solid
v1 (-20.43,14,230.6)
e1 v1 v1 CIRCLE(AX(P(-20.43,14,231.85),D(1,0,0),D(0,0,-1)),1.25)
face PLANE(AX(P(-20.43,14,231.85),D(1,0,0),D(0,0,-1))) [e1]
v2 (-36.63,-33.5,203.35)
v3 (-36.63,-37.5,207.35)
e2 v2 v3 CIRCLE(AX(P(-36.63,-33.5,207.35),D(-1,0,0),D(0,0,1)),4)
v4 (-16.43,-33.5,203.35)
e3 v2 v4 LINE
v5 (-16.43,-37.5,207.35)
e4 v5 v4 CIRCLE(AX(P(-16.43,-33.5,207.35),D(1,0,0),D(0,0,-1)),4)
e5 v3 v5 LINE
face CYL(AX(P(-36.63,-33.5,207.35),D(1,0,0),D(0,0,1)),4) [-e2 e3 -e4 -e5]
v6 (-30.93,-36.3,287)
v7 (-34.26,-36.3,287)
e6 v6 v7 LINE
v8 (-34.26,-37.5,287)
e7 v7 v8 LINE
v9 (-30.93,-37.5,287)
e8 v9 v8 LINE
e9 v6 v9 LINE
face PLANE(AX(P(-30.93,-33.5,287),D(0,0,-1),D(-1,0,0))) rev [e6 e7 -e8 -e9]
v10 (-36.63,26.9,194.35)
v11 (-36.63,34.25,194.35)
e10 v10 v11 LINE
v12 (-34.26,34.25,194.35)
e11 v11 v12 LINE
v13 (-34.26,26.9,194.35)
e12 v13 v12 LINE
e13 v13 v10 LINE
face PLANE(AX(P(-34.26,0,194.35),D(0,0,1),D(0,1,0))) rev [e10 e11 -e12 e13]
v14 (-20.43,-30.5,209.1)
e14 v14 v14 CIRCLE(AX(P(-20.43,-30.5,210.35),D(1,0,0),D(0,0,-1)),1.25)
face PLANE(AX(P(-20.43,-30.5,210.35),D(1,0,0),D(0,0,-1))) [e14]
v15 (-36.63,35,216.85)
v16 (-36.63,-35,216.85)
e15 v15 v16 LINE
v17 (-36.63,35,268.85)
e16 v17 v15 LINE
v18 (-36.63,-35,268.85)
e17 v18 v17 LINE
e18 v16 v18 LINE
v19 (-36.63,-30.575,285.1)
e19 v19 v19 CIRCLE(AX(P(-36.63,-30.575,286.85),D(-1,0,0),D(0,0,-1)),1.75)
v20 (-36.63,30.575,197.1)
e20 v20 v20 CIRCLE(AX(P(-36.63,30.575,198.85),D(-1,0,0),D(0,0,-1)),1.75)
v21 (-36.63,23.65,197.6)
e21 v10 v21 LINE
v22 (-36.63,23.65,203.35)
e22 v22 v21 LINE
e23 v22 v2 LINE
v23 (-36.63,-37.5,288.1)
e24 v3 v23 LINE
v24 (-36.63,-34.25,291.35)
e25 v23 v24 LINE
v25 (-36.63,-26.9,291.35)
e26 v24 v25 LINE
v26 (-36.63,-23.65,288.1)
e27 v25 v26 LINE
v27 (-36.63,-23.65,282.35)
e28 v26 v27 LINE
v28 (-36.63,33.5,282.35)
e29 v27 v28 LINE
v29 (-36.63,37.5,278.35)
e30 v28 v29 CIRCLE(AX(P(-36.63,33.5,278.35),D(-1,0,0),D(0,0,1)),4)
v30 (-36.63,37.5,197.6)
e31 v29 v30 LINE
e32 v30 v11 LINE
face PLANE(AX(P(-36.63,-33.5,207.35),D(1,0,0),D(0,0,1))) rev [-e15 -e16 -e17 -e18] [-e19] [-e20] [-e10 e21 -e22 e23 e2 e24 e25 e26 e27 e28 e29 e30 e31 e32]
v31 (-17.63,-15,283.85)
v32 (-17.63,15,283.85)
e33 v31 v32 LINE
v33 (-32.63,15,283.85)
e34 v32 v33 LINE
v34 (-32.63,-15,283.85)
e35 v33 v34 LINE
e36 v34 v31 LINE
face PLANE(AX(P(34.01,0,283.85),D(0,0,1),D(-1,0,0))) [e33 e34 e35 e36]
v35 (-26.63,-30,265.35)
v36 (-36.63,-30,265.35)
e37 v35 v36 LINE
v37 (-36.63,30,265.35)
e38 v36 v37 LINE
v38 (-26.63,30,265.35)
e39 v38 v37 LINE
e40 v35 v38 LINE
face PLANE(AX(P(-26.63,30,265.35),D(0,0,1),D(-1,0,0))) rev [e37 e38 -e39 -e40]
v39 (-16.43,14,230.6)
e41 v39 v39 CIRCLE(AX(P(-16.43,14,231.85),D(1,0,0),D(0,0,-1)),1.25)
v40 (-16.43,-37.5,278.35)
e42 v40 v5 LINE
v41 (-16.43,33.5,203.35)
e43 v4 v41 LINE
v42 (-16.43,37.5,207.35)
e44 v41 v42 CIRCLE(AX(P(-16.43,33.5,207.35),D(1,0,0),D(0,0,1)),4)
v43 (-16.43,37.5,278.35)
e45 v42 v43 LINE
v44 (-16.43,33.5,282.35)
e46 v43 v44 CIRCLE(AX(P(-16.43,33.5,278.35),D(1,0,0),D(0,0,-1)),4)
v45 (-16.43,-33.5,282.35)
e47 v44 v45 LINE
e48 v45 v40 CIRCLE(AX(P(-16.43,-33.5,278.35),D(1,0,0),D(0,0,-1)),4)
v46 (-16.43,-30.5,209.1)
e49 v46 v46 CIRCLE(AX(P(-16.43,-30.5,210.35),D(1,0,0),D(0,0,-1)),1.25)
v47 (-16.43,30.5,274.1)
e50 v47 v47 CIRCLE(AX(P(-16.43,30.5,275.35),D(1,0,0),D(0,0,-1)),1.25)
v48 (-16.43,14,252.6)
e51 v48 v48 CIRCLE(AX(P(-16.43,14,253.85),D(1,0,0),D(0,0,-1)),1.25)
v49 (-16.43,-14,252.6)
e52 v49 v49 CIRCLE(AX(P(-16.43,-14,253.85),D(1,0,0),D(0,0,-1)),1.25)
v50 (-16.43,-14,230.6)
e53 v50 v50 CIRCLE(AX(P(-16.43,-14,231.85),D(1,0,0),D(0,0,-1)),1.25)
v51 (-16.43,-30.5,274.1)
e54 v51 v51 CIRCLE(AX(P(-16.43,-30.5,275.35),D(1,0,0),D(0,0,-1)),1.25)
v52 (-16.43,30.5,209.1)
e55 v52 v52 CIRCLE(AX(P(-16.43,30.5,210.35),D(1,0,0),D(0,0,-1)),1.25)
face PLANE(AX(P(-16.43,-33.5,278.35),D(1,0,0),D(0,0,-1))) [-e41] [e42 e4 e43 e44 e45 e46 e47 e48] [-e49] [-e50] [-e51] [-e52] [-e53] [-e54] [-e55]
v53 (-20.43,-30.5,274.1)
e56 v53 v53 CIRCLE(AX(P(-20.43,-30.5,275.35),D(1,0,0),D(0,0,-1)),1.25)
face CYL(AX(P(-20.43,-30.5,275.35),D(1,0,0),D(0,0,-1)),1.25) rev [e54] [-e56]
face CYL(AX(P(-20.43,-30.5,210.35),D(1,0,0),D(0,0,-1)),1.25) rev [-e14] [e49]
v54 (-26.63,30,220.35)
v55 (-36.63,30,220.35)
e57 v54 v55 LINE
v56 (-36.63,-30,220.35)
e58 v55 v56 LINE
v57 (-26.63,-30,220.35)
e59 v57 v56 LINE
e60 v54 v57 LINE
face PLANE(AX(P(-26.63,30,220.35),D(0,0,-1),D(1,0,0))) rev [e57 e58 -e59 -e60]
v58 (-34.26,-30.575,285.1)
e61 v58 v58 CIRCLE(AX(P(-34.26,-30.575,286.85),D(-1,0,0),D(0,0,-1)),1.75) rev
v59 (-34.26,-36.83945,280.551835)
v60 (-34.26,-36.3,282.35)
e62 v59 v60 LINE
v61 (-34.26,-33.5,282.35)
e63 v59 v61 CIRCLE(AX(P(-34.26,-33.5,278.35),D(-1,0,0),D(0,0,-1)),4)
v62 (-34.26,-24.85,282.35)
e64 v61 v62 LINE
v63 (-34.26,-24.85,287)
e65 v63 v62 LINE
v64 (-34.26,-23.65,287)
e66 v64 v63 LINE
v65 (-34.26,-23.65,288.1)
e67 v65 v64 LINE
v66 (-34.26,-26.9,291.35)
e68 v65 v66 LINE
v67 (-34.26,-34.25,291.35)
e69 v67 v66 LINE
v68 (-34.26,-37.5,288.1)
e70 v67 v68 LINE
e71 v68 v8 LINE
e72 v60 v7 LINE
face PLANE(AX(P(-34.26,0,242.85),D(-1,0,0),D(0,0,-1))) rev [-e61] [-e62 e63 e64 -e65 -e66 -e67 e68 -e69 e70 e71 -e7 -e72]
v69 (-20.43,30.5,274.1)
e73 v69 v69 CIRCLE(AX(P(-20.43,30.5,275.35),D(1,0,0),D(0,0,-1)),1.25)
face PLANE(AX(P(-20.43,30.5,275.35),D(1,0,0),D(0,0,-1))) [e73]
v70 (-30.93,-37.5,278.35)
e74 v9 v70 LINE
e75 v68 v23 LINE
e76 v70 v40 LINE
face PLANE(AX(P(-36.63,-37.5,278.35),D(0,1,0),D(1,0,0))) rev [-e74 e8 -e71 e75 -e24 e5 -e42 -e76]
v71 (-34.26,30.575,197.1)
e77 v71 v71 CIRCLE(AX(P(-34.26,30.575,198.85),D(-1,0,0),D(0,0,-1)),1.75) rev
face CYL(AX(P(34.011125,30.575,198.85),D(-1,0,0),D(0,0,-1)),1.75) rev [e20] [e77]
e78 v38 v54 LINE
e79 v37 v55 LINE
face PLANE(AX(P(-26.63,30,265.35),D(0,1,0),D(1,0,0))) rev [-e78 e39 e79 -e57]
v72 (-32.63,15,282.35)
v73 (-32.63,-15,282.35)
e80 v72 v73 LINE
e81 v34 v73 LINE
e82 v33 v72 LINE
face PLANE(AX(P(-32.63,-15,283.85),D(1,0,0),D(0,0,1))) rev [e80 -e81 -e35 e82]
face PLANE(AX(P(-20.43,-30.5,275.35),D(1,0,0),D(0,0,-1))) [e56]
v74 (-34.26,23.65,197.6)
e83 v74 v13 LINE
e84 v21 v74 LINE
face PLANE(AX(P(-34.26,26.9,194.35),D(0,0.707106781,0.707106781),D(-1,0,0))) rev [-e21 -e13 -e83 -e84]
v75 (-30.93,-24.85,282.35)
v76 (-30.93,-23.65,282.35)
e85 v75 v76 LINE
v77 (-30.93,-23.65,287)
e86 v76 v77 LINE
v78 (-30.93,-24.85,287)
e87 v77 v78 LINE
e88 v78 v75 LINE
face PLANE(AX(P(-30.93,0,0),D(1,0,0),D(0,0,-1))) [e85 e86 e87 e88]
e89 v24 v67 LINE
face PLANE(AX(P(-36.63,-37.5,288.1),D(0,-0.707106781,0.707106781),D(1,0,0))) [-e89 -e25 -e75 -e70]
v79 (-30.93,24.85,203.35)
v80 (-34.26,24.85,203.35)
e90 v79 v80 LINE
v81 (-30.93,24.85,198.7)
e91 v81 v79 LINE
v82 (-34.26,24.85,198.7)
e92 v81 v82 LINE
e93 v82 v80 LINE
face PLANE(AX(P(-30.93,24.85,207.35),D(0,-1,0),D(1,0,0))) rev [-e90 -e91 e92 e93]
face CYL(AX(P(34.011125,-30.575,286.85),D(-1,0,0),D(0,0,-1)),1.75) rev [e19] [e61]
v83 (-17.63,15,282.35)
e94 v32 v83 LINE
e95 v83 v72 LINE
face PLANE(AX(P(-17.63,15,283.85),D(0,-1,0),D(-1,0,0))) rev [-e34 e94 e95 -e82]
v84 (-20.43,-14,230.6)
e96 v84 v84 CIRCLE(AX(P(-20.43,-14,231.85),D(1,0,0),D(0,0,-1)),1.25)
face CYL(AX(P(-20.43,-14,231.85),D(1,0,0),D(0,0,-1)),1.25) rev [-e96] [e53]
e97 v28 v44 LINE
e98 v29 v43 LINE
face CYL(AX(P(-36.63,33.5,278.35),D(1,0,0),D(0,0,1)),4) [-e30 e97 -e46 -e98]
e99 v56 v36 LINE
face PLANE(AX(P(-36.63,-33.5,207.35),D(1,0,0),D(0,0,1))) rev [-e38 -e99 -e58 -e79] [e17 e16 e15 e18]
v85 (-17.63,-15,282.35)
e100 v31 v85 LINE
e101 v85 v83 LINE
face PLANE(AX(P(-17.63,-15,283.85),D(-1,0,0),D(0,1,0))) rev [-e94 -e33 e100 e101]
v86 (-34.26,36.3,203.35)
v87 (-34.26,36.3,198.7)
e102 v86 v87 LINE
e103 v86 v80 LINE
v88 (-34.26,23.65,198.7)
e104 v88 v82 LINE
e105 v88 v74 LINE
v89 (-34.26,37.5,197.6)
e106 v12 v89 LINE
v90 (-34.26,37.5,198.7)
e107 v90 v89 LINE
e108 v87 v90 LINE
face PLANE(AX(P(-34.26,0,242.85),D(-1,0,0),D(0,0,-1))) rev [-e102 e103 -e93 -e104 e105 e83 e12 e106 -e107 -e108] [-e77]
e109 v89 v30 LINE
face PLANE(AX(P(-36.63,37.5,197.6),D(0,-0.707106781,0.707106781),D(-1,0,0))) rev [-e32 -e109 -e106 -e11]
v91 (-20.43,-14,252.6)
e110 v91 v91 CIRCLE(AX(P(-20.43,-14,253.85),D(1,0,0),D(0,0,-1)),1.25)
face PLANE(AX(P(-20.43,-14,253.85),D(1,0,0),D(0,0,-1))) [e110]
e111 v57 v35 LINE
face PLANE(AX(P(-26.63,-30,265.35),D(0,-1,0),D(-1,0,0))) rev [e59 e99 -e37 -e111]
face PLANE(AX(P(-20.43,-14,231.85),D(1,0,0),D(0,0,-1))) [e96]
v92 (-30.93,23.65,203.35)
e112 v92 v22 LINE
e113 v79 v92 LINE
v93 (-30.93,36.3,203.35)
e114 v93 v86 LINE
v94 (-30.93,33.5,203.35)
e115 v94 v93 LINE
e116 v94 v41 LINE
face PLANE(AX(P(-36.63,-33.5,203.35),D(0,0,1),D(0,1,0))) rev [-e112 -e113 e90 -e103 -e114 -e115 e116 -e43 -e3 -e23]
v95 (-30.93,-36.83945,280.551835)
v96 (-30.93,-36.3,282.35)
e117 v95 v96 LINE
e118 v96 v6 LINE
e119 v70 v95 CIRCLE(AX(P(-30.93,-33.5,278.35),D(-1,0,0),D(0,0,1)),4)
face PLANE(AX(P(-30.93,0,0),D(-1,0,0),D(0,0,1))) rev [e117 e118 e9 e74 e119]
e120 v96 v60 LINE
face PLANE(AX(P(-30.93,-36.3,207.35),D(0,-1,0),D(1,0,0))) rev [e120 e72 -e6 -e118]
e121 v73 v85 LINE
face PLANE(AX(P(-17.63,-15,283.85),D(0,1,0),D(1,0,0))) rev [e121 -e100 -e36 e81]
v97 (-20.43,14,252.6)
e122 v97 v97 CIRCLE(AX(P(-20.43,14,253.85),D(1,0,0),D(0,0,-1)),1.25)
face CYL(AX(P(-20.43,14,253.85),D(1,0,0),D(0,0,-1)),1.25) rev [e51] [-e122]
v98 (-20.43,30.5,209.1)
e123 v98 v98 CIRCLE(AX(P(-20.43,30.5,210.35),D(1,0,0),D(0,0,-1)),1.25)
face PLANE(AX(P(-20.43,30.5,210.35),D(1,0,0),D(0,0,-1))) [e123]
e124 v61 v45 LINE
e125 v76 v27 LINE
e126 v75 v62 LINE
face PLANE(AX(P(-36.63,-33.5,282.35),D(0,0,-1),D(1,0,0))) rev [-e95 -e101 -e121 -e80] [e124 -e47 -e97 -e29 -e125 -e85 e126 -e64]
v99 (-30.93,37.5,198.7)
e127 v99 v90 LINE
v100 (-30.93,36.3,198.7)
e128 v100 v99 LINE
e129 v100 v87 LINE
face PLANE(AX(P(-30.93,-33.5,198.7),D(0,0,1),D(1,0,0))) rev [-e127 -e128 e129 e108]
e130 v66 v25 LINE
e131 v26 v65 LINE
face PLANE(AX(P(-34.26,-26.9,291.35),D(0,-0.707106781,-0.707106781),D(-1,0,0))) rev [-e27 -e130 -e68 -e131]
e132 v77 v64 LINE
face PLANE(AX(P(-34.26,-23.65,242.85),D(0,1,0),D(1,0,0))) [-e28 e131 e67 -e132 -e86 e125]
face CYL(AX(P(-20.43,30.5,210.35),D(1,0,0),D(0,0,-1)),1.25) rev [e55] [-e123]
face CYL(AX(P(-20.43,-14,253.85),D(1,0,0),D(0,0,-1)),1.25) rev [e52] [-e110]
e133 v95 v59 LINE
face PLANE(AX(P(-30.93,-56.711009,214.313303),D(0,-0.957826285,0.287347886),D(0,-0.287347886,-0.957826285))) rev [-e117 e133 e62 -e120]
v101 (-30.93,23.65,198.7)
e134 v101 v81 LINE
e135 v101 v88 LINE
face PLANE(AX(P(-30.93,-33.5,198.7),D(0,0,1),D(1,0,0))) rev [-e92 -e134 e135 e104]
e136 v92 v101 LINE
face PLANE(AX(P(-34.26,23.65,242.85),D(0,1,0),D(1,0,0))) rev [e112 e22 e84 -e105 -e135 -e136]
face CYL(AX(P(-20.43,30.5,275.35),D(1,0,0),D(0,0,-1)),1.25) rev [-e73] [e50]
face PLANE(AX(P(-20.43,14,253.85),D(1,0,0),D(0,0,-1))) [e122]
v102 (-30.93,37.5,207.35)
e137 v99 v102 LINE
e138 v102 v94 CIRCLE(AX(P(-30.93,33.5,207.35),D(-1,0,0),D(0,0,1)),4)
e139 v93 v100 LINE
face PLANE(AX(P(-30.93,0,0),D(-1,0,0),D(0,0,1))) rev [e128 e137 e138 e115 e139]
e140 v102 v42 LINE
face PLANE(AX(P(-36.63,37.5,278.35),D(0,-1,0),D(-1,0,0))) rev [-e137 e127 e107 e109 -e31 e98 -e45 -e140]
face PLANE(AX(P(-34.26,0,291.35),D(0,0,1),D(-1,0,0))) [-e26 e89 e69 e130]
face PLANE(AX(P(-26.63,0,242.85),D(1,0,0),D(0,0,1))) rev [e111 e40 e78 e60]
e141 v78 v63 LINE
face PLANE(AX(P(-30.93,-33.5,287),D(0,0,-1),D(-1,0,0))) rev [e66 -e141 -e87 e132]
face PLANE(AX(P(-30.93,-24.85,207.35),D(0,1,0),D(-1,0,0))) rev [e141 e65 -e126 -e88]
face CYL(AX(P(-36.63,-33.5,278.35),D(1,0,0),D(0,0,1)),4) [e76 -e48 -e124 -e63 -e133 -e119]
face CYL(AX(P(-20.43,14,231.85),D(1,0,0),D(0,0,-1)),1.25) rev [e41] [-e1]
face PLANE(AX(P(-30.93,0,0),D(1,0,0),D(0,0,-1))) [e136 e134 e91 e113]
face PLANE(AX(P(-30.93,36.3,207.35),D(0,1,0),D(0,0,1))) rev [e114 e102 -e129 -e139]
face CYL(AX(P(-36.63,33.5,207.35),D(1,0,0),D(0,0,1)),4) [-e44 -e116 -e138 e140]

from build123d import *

# Parameters (mm, degrees)
CUT_EXTRUDE2_START       = -5.64
CUT_EXTRUDE2_DEPTH       = 15.64
CUT_EXTRUDE2_START_2     = 10
CUT_EXTRUDE2_2_OUTLINE_W = 45
CUT_EXTRUDE2_2_OUTLINE_H = 60
CUT_EXTRUDE2_2_DEPTH     = 10
CUT_EXTRUDE2_3_OUTLINE_W = 3.75
CUT_EXTRUDE2_3_OUTLINE_H = 5.38
CUT_EXTRUDE2_3_OUTLINE_R = 2.25
CUT_EXTRUDE2_3_DEPTH     = 5.64
CUT_EXTRUDE2_START_3     = 1
CUT_EXTRUDE2_4_OUTLINE_W = 1.5
CUT_EXTRUDE2_4_OUTLINE_H = 30
CUT_EXTRUDE2_4_DEPTH     = 15
CUT_EXTRUDE2_START_4     = 17.63
CUT_EXTRUDE2_5_OUTLINE_R = 1.75
CUT_EXTRUDE2_5_DEPTH     = 2.37
CUT_EXTRUDE2_6_OUTLINE_W = 3.75
CUT_EXTRUDE2_6_OUTLINE_H = 5.38
CUT_EXTRUDE2_6_DEPTH     = 2.76
SKETCH2_3_W              = 140.737770098
SKETCH2_3_H              = 110.811519169
CUT_EXTRUDE3_DEPTH       = 304.171110926
BOSS_EXTRUDE1_START      = -2.37
SKETCH3_W                = 4.65
SKETCH3_H                = 1.2
BOSS_EXTRUDE1_DEPTH      = 5.7
BOSS_EXTRUDE2_START      = 0.2
BOSS_EXTRUDE2_DEPTH      = 0.2
SKETCH5_R                = 1.25
CUT_EXTRUDE4_DEPTH       = 4


with BuildPart() as part:
    # Cut-Extrude2: read off the stored shape, not the designer's step
    # Cut-Extrude2 outline → Cut-Extrude2 (new body)
    with BuildSketch(Plane.ZY.offset(16.63).offset(CUT_EXTRUDE2_START)):
        with BuildLine():
            Line((278.35, 37.5), (207.35, 37.5))
            ThreePointArc((207.35, 37.5), (204.521572875, 36.328427125), (203.35, 33.5))
            Line((203.35, 33.5), (203.35, -33.5))
            ThreePointArc((203.35, -33.5), (204.521572875, -36.328427125), (207.35, -37.5))
            Line((207.35, -37.5), (278.35, -37.5))
            ThreePointArc((278.35, -37.5), (281.178427125, -36.328427125), (282.35, -33.5))
            Line((282.35, -33.5), (282.35, 33.5))
            ThreePointArc((282.35, 33.5), (281.178427125, 36.328427125), (278.35, 37.5))
        make_face()
    extrude(amount=CUT_EXTRUDE2_DEPTH)

    # Cut-Extrude2 2 outline → Cut-Extrude2 2 (add)
    with BuildSketch(Plane.ZY.offset(16.63).offset(CUT_EXTRUDE2_START_2)):
        with BuildLine():
            Line((278.35, 37.5), (207.35, 37.5))
            ThreePointArc((207.35, 37.5), (204.521572875, 36.328427125), (203.35, 33.5))
            Line((203.35, 33.5), (203.35, -33.5))
            ThreePointArc((203.35, -33.5), (204.521572875, -36.328427125), (207.35, -37.5))
            Line((207.35, -37.5), (278.35, -37.5))
            ThreePointArc((278.35, -37.5), (281.178427125, -36.328427125), (282.35, -33.5))
            Line((282.35, -33.5), (282.35, 33.5))
            ThreePointArc((282.35, 33.5), (281.178427125, 36.328427125), (278.35, 37.5))
        make_face()
        with Locations((242.85, 0)):
            Rectangle(CUT_EXTRUDE2_2_OUTLINE_W, CUT_EXTRUDE2_2_OUTLINE_H, mode=Mode.SUBTRACT)
    extrude(amount=CUT_EXTRUDE2_2_DEPTH)

    # Cut-Extrude2 3 outline → Cut-Extrude2 3 (add)
    with BuildSketch(Plane.ZY.offset(16.63).offset(CUT_EXTRUDE2_START)):
        with BuildLine():
            Line((265.098595461, 50), (220.601404539, 50))
            ThreePointArc((220.601404539, 50), (219.943611025, 49.92699636), (219.317831724, 49.711538462))
            ThreePointArc((219.317831724, 49.711538462), (203.959127035, 38.890872965), (193.138461538, 23.532168276))
            ThreePointArc((193.138461538, 23.532168276), (192.973645398, 23.10099455), (192.876926999, 22.649640261))
            ThreePointArc((192.876926999, 22.649640261), (192.307463231, 21.255507449), (191.132317903, 20.313738508))
            ThreePointArc((191.132317903, 20.313738508), (189.716924685, 19.276000929), (188.85, 17.75))
            Line((188.85, 17.75), (187.489252005, 13.440964681))
            ThreePointArc((187.489252005, 13.440964681), (187.385017371, 12.994602312), (187.35, 12.537570577))
            Line((187.35, 12.537570577), (187.35, -12.537570577))
            ThreePointArc((187.35, -12.537570577), (187.385017371, -12.994602312), (187.489252005, -13.440964681))
            Line((187.489252005, -13.440964681), (188.85, -17.75))
            ThreePointArc((188.85, -17.75), (189.716924685, -19.276000929), (191.132317903, -20.313738508))
            ThreePointArc((191.132317903, -20.313738508), (192.307463231, -21.255507449), (192.876926999, -22.649640261))
            ThreePointArc((192.876926999, -22.649640261), (192.973645398, -23.10099455), (193.138461538, -23.532168276))
            ThreePointArc((193.138461538, -23.532168276), (203.959127035, -38.890872965), (219.317831724, -49.711538462))
            ThreePointArc((219.317831724, -49.711538462), (219.943611025, -49.92699636), (220.601404539, -50))
            Line((220.601404539, -50), (265.098595461, -50))
            ThreePointArc((265.098595461, -50), (265.756388975, -49.92699636), (266.382168276, -49.711538462))
            ThreePointArc((266.382168276, -49.711538462), (281.740872965, -38.890872965), (292.561538462, -23.532168276))
            ThreePointArc((292.561538462, -23.532168276), (292.726354602, -23.10099455), (292.823073001, -22.649640261))
            ThreePointArc((292.823073001, -22.649640261), (293.392536769, -21.255507449), (294.567682097, -20.313738508))
            ThreePointArc((294.567682097, -20.313738508), (295.983075315, -19.276000929), (296.85, -17.75))
            Line((296.85, -17.75), (298.210747995, -13.440964681))
            ThreePointArc((298.210747995, -13.440964681), (298.314982629, -12.994602312), (298.35, -12.537570577))
            Line((298.35, -12.537570577), (298.35, 12.537570577))
            ThreePointArc((298.35, 12.537570577), (298.314982629, 12.994602312), (298.210747995, 13.440964681))
            Line((298.210747995, 13.440964681), (296.85, 17.75))
            ThreePointArc((296.85, 17.75), (295.983075315, 19.276000929), (294.567682097, 20.313738508))
            ThreePointArc((294.567682097, 20.313738508), (293.392536769, 21.255507449), (292.823073001, 22.649640261))
            ThreePointArc((292.823073001, 22.649640261), (292.726354602, 23.10099455), (292.561538462, 23.532168276))
            ThreePointArc((292.561538462, 23.532168276), (281.740872965, 38.890872965), (266.382168276, 49.711538462))
            ThreePointArc((266.382168276, 49.711538462), (265.756388975, 49.92699636), (265.098595461, 50))
        make_face()
        with BuildLine():
            ThreePointArc((282.35, -33.5), (281.178427125, -36.328427125), (278.35, -37.5))
            Line((278.35, -37.5), (207.35, -37.5))
            ThreePointArc((207.35, -37.5), (204.521572875, -36.328427125), (203.35, -33.5))
            Line((203.35, -33.5), (203.35, 33.5))
            ThreePointArc((203.35, 33.5), (204.521572875, 36.328427125), (207.35, 37.5))
            Line((207.35, 37.5), (278.35, 37.5))
            ThreePointArc((278.35, 37.5), (281.178427125, 36.328427125), (282.35, 33.5))
            Line((282.35, 33.5), (282.35, -33.5))
        make_face(mode=Mode.SUBTRACT)
        with Locations((291.85, -15.815)):
            Rectangle(CUT_EXTRUDE2_3_OUTLINE_W, CUT_EXTRUDE2_3_OUTLINE_H, mode=Mode.SUBTRACT)
        with Locations((294.35, 0)):
            Circle(CUT_EXTRUDE2_3_OUTLINE_R, mode=Mode.SUBTRACT)
        with Locations((291.85, 15.815)):
            Rectangle(CUT_EXTRUDE2_3_OUTLINE_W, CUT_EXTRUDE2_3_OUTLINE_H, mode=Mode.SUBTRACT)
        with Locations((193.85, 15.815)):
            Rectangle(CUT_EXTRUDE2_3_OUTLINE_W, CUT_EXTRUDE2_3_OUTLINE_H, mode=Mode.SUBTRACT)
        with Locations((193.85, -15.815)):
            Rectangle(CUT_EXTRUDE2_3_OUTLINE_W, CUT_EXTRUDE2_3_OUTLINE_H, mode=Mode.SUBTRACT)
        with Locations((191.35, 0)):
            Circle(CUT_EXTRUDE2_3_OUTLINE_R, mode=Mode.SUBTRACT)
    extrude(amount=CUT_EXTRUDE2_3_DEPTH)

    # Cut-Extrude2 4 outline → Cut-Extrude2 4 (add)
    with BuildSketch(Plane.ZY.offset(16.63).offset(CUT_EXTRUDE2_START_3)):
        with Locations((283.1, 0)):
            Rectangle(CUT_EXTRUDE2_4_OUTLINE_W, CUT_EXTRUDE2_4_OUTLINE_H)
    extrude(amount=CUT_EXTRUDE2_4_DEPTH)

    # Cut-Extrude2 5 outline → Cut-Extrude2 5 (add)
    # profile 1 of 2: a face of its own
    with BuildSketch(Plane.ZY.offset(16.63).offset(CUT_EXTRUDE2_START_4)):
        with BuildLine():
            Line((194.35, 26.9), (197.6, 23.65))
            Line((197.6, 23.65), (203.35, 23.65))
            Line((203.35, 23.65), (203.35, 33.5))
            ThreePointArc((203.35, 33.5), (204.521572875, 36.328427125), (207.35, 37.5))
            Line((207.35, 37.5), (197.6, 37.5))
            Line((197.6, 37.5), (194.35, 34.25))
            Line((194.35, 34.25), (194.35, 26.9))
        make_face()
        with Locations((198.85, 30.575)):
            Circle(CUT_EXTRUDE2_5_OUTLINE_R, mode=Mode.SUBTRACT)
    # profile 2 of 2: a face of its own
    with BuildSketch(Plane.ZY.offset(16.63).offset(CUT_EXTRUDE2_START_4)):
        with BuildLine():
            Line((288.1, -23.65), (282.35, -23.65))
            Line((282.35, -23.65), (282.35, -33.5))
            ThreePointArc((282.35, -33.5), (281.178427125, -36.328427125), (278.35, -37.5))
            Line((278.35, -37.5), (288.1, -37.5))
            Line((288.1, -37.5), (291.35, -34.25))
            Line((291.35, -34.25), (291.35, -26.9))
            Line((291.35, -26.9), (288.1, -23.65))
        make_face()
        with Locations((286.85, -30.575)):
            Circle(CUT_EXTRUDE2_5_OUTLINE_R, mode=Mode.SUBTRACT)
    extrude(amount=CUT_EXTRUDE2_5_DEPTH)

    # Cut-Extrude2 6 outline → Cut-Extrude2 6 (add)
    with BuildSketch(Plane.ZY.offset(16.63).offset(CUT_EXTRUDE2_START)):
        with Locations((193.85, 15.815)):
            Rectangle(CUT_EXTRUDE2_6_OUTLINE_W, CUT_EXTRUDE2_6_OUTLINE_H)
        with Locations((193.85, -15.815)):
            Rectangle(CUT_EXTRUDE2_6_OUTLINE_W, CUT_EXTRUDE2_6_OUTLINE_H)
        with Locations((291.85, 15.815)):
            Rectangle(CUT_EXTRUDE2_6_OUTLINE_W, CUT_EXTRUDE2_6_OUTLINE_H)
        with Locations((291.85, -15.815)):
            Rectangle(CUT_EXTRUDE2_6_OUTLINE_W, CUT_EXTRUDE2_6_OUTLINE_H)
    extrude(amount=CUT_EXTRUDE2_6_DEPTH)

    # Sketch2<3> → Cut-Extrude3 (cut, through all)
    with BuildSketch(Plane.ZY.offset(16.63)):
        with Locations((257.718885049, 1.798950297)):
            Rectangle(SKETCH2_3_W, SKETCH2_3_H)
    extrude(amount=-CUT_EXTRUDE3_DEPTH, mode=Mode.SUBTRACT)

    # Sketch3 → Boss-Extrude1 (add)
    with BuildSketch(Plane(origin=(-34.26, 0, 0), x_dir=(0, 0, -1), z_dir=(1, 0, 0)).offset(BOSS_EXTRUDE1_START)):
        Polygon((-207.35, 37.5), (-198.7, 37.5), (-198.7, 36.3), (-203.35, 36.3), (-203.35, 33.5), align=None)
        with Locations((-201.025, 24.25)):
            Rectangle(SKETCH3_W, SKETCH3_H)
        Polygon((-287, -37.5), (-287, -36.3), (-282.35, -36.3), (-278.35, -37.5), align=None)
        with Locations((-284.675, -24.25)):
            Rectangle(SKETCH3_W, SKETCH3_H)
    extrude(amount=BOSS_EXTRUDE1_DEPTH)

    # Sketch4 → Boss-Extrude2 (add)
    with BuildSketch(Plane(origin=(-16.63, 0, 0), x_dir=(0, 0, -1), z_dir=(1, 0, 0)).offset(BOSS_EXTRUDE2_START)):
        with BuildLine():
            Line((-278.35, 37.5), (-207.35, 37.5))
            ThreePointArc((-207.35, 37.5), (-204.521572875, 36.328427125), (-203.35, 33.5))
            Line((-203.35, 33.5), (-203.35, -33.5))
            ThreePointArc((-203.35, -33.5), (-204.521572875, -36.328427125), (-207.35, -37.5))
            Line((-207.35, -37.5), (-278.35, -37.5))
            ThreePointArc((-278.35, -37.5), (-281.178427125, -36.328427125), (-282.35, -33.5))
            Line((-282.35, -33.5), (-282.35, 33.5))
            ThreePointArc((-282.35, 33.5), (-281.178427125, 36.328427125), (-278.35, 37.5))
        make_face()
    extrude(amount=-BOSS_EXTRUDE2_DEPTH)

    # Sketch5 → Cut-Extrude4 (cut)
    with BuildSketch(Plane(origin=(-16.43, 0, 0), x_dir=(0, 0, -1), z_dir=(1, 0, 0))):
        with Locations((-275.35, 30.5)):
            Circle(SKETCH5_R)
        with Locations((-210.35, 30.5)):
            Circle(SKETCH5_R)
        with Locations((-210.35, -30.5)):
            Circle(SKETCH5_R)
        with Locations((-275.35, -30.5)):
            Circle(SKETCH5_R)
        with Locations((-253.85, 14)):
            Circle(SKETCH5_R)
        with Locations((-231.85, 14)):
            Circle(SKETCH5_R)
        with Locations((-231.85, -14)):
            Circle(SKETCH5_R)
        with Locations((-253.85, -14)):
            Circle(SKETCH5_R)
    extrude(amount=-CUT_EXTRUDE4_DEPTH, mode=Mode.SUBTRACT)


solid = part.part
